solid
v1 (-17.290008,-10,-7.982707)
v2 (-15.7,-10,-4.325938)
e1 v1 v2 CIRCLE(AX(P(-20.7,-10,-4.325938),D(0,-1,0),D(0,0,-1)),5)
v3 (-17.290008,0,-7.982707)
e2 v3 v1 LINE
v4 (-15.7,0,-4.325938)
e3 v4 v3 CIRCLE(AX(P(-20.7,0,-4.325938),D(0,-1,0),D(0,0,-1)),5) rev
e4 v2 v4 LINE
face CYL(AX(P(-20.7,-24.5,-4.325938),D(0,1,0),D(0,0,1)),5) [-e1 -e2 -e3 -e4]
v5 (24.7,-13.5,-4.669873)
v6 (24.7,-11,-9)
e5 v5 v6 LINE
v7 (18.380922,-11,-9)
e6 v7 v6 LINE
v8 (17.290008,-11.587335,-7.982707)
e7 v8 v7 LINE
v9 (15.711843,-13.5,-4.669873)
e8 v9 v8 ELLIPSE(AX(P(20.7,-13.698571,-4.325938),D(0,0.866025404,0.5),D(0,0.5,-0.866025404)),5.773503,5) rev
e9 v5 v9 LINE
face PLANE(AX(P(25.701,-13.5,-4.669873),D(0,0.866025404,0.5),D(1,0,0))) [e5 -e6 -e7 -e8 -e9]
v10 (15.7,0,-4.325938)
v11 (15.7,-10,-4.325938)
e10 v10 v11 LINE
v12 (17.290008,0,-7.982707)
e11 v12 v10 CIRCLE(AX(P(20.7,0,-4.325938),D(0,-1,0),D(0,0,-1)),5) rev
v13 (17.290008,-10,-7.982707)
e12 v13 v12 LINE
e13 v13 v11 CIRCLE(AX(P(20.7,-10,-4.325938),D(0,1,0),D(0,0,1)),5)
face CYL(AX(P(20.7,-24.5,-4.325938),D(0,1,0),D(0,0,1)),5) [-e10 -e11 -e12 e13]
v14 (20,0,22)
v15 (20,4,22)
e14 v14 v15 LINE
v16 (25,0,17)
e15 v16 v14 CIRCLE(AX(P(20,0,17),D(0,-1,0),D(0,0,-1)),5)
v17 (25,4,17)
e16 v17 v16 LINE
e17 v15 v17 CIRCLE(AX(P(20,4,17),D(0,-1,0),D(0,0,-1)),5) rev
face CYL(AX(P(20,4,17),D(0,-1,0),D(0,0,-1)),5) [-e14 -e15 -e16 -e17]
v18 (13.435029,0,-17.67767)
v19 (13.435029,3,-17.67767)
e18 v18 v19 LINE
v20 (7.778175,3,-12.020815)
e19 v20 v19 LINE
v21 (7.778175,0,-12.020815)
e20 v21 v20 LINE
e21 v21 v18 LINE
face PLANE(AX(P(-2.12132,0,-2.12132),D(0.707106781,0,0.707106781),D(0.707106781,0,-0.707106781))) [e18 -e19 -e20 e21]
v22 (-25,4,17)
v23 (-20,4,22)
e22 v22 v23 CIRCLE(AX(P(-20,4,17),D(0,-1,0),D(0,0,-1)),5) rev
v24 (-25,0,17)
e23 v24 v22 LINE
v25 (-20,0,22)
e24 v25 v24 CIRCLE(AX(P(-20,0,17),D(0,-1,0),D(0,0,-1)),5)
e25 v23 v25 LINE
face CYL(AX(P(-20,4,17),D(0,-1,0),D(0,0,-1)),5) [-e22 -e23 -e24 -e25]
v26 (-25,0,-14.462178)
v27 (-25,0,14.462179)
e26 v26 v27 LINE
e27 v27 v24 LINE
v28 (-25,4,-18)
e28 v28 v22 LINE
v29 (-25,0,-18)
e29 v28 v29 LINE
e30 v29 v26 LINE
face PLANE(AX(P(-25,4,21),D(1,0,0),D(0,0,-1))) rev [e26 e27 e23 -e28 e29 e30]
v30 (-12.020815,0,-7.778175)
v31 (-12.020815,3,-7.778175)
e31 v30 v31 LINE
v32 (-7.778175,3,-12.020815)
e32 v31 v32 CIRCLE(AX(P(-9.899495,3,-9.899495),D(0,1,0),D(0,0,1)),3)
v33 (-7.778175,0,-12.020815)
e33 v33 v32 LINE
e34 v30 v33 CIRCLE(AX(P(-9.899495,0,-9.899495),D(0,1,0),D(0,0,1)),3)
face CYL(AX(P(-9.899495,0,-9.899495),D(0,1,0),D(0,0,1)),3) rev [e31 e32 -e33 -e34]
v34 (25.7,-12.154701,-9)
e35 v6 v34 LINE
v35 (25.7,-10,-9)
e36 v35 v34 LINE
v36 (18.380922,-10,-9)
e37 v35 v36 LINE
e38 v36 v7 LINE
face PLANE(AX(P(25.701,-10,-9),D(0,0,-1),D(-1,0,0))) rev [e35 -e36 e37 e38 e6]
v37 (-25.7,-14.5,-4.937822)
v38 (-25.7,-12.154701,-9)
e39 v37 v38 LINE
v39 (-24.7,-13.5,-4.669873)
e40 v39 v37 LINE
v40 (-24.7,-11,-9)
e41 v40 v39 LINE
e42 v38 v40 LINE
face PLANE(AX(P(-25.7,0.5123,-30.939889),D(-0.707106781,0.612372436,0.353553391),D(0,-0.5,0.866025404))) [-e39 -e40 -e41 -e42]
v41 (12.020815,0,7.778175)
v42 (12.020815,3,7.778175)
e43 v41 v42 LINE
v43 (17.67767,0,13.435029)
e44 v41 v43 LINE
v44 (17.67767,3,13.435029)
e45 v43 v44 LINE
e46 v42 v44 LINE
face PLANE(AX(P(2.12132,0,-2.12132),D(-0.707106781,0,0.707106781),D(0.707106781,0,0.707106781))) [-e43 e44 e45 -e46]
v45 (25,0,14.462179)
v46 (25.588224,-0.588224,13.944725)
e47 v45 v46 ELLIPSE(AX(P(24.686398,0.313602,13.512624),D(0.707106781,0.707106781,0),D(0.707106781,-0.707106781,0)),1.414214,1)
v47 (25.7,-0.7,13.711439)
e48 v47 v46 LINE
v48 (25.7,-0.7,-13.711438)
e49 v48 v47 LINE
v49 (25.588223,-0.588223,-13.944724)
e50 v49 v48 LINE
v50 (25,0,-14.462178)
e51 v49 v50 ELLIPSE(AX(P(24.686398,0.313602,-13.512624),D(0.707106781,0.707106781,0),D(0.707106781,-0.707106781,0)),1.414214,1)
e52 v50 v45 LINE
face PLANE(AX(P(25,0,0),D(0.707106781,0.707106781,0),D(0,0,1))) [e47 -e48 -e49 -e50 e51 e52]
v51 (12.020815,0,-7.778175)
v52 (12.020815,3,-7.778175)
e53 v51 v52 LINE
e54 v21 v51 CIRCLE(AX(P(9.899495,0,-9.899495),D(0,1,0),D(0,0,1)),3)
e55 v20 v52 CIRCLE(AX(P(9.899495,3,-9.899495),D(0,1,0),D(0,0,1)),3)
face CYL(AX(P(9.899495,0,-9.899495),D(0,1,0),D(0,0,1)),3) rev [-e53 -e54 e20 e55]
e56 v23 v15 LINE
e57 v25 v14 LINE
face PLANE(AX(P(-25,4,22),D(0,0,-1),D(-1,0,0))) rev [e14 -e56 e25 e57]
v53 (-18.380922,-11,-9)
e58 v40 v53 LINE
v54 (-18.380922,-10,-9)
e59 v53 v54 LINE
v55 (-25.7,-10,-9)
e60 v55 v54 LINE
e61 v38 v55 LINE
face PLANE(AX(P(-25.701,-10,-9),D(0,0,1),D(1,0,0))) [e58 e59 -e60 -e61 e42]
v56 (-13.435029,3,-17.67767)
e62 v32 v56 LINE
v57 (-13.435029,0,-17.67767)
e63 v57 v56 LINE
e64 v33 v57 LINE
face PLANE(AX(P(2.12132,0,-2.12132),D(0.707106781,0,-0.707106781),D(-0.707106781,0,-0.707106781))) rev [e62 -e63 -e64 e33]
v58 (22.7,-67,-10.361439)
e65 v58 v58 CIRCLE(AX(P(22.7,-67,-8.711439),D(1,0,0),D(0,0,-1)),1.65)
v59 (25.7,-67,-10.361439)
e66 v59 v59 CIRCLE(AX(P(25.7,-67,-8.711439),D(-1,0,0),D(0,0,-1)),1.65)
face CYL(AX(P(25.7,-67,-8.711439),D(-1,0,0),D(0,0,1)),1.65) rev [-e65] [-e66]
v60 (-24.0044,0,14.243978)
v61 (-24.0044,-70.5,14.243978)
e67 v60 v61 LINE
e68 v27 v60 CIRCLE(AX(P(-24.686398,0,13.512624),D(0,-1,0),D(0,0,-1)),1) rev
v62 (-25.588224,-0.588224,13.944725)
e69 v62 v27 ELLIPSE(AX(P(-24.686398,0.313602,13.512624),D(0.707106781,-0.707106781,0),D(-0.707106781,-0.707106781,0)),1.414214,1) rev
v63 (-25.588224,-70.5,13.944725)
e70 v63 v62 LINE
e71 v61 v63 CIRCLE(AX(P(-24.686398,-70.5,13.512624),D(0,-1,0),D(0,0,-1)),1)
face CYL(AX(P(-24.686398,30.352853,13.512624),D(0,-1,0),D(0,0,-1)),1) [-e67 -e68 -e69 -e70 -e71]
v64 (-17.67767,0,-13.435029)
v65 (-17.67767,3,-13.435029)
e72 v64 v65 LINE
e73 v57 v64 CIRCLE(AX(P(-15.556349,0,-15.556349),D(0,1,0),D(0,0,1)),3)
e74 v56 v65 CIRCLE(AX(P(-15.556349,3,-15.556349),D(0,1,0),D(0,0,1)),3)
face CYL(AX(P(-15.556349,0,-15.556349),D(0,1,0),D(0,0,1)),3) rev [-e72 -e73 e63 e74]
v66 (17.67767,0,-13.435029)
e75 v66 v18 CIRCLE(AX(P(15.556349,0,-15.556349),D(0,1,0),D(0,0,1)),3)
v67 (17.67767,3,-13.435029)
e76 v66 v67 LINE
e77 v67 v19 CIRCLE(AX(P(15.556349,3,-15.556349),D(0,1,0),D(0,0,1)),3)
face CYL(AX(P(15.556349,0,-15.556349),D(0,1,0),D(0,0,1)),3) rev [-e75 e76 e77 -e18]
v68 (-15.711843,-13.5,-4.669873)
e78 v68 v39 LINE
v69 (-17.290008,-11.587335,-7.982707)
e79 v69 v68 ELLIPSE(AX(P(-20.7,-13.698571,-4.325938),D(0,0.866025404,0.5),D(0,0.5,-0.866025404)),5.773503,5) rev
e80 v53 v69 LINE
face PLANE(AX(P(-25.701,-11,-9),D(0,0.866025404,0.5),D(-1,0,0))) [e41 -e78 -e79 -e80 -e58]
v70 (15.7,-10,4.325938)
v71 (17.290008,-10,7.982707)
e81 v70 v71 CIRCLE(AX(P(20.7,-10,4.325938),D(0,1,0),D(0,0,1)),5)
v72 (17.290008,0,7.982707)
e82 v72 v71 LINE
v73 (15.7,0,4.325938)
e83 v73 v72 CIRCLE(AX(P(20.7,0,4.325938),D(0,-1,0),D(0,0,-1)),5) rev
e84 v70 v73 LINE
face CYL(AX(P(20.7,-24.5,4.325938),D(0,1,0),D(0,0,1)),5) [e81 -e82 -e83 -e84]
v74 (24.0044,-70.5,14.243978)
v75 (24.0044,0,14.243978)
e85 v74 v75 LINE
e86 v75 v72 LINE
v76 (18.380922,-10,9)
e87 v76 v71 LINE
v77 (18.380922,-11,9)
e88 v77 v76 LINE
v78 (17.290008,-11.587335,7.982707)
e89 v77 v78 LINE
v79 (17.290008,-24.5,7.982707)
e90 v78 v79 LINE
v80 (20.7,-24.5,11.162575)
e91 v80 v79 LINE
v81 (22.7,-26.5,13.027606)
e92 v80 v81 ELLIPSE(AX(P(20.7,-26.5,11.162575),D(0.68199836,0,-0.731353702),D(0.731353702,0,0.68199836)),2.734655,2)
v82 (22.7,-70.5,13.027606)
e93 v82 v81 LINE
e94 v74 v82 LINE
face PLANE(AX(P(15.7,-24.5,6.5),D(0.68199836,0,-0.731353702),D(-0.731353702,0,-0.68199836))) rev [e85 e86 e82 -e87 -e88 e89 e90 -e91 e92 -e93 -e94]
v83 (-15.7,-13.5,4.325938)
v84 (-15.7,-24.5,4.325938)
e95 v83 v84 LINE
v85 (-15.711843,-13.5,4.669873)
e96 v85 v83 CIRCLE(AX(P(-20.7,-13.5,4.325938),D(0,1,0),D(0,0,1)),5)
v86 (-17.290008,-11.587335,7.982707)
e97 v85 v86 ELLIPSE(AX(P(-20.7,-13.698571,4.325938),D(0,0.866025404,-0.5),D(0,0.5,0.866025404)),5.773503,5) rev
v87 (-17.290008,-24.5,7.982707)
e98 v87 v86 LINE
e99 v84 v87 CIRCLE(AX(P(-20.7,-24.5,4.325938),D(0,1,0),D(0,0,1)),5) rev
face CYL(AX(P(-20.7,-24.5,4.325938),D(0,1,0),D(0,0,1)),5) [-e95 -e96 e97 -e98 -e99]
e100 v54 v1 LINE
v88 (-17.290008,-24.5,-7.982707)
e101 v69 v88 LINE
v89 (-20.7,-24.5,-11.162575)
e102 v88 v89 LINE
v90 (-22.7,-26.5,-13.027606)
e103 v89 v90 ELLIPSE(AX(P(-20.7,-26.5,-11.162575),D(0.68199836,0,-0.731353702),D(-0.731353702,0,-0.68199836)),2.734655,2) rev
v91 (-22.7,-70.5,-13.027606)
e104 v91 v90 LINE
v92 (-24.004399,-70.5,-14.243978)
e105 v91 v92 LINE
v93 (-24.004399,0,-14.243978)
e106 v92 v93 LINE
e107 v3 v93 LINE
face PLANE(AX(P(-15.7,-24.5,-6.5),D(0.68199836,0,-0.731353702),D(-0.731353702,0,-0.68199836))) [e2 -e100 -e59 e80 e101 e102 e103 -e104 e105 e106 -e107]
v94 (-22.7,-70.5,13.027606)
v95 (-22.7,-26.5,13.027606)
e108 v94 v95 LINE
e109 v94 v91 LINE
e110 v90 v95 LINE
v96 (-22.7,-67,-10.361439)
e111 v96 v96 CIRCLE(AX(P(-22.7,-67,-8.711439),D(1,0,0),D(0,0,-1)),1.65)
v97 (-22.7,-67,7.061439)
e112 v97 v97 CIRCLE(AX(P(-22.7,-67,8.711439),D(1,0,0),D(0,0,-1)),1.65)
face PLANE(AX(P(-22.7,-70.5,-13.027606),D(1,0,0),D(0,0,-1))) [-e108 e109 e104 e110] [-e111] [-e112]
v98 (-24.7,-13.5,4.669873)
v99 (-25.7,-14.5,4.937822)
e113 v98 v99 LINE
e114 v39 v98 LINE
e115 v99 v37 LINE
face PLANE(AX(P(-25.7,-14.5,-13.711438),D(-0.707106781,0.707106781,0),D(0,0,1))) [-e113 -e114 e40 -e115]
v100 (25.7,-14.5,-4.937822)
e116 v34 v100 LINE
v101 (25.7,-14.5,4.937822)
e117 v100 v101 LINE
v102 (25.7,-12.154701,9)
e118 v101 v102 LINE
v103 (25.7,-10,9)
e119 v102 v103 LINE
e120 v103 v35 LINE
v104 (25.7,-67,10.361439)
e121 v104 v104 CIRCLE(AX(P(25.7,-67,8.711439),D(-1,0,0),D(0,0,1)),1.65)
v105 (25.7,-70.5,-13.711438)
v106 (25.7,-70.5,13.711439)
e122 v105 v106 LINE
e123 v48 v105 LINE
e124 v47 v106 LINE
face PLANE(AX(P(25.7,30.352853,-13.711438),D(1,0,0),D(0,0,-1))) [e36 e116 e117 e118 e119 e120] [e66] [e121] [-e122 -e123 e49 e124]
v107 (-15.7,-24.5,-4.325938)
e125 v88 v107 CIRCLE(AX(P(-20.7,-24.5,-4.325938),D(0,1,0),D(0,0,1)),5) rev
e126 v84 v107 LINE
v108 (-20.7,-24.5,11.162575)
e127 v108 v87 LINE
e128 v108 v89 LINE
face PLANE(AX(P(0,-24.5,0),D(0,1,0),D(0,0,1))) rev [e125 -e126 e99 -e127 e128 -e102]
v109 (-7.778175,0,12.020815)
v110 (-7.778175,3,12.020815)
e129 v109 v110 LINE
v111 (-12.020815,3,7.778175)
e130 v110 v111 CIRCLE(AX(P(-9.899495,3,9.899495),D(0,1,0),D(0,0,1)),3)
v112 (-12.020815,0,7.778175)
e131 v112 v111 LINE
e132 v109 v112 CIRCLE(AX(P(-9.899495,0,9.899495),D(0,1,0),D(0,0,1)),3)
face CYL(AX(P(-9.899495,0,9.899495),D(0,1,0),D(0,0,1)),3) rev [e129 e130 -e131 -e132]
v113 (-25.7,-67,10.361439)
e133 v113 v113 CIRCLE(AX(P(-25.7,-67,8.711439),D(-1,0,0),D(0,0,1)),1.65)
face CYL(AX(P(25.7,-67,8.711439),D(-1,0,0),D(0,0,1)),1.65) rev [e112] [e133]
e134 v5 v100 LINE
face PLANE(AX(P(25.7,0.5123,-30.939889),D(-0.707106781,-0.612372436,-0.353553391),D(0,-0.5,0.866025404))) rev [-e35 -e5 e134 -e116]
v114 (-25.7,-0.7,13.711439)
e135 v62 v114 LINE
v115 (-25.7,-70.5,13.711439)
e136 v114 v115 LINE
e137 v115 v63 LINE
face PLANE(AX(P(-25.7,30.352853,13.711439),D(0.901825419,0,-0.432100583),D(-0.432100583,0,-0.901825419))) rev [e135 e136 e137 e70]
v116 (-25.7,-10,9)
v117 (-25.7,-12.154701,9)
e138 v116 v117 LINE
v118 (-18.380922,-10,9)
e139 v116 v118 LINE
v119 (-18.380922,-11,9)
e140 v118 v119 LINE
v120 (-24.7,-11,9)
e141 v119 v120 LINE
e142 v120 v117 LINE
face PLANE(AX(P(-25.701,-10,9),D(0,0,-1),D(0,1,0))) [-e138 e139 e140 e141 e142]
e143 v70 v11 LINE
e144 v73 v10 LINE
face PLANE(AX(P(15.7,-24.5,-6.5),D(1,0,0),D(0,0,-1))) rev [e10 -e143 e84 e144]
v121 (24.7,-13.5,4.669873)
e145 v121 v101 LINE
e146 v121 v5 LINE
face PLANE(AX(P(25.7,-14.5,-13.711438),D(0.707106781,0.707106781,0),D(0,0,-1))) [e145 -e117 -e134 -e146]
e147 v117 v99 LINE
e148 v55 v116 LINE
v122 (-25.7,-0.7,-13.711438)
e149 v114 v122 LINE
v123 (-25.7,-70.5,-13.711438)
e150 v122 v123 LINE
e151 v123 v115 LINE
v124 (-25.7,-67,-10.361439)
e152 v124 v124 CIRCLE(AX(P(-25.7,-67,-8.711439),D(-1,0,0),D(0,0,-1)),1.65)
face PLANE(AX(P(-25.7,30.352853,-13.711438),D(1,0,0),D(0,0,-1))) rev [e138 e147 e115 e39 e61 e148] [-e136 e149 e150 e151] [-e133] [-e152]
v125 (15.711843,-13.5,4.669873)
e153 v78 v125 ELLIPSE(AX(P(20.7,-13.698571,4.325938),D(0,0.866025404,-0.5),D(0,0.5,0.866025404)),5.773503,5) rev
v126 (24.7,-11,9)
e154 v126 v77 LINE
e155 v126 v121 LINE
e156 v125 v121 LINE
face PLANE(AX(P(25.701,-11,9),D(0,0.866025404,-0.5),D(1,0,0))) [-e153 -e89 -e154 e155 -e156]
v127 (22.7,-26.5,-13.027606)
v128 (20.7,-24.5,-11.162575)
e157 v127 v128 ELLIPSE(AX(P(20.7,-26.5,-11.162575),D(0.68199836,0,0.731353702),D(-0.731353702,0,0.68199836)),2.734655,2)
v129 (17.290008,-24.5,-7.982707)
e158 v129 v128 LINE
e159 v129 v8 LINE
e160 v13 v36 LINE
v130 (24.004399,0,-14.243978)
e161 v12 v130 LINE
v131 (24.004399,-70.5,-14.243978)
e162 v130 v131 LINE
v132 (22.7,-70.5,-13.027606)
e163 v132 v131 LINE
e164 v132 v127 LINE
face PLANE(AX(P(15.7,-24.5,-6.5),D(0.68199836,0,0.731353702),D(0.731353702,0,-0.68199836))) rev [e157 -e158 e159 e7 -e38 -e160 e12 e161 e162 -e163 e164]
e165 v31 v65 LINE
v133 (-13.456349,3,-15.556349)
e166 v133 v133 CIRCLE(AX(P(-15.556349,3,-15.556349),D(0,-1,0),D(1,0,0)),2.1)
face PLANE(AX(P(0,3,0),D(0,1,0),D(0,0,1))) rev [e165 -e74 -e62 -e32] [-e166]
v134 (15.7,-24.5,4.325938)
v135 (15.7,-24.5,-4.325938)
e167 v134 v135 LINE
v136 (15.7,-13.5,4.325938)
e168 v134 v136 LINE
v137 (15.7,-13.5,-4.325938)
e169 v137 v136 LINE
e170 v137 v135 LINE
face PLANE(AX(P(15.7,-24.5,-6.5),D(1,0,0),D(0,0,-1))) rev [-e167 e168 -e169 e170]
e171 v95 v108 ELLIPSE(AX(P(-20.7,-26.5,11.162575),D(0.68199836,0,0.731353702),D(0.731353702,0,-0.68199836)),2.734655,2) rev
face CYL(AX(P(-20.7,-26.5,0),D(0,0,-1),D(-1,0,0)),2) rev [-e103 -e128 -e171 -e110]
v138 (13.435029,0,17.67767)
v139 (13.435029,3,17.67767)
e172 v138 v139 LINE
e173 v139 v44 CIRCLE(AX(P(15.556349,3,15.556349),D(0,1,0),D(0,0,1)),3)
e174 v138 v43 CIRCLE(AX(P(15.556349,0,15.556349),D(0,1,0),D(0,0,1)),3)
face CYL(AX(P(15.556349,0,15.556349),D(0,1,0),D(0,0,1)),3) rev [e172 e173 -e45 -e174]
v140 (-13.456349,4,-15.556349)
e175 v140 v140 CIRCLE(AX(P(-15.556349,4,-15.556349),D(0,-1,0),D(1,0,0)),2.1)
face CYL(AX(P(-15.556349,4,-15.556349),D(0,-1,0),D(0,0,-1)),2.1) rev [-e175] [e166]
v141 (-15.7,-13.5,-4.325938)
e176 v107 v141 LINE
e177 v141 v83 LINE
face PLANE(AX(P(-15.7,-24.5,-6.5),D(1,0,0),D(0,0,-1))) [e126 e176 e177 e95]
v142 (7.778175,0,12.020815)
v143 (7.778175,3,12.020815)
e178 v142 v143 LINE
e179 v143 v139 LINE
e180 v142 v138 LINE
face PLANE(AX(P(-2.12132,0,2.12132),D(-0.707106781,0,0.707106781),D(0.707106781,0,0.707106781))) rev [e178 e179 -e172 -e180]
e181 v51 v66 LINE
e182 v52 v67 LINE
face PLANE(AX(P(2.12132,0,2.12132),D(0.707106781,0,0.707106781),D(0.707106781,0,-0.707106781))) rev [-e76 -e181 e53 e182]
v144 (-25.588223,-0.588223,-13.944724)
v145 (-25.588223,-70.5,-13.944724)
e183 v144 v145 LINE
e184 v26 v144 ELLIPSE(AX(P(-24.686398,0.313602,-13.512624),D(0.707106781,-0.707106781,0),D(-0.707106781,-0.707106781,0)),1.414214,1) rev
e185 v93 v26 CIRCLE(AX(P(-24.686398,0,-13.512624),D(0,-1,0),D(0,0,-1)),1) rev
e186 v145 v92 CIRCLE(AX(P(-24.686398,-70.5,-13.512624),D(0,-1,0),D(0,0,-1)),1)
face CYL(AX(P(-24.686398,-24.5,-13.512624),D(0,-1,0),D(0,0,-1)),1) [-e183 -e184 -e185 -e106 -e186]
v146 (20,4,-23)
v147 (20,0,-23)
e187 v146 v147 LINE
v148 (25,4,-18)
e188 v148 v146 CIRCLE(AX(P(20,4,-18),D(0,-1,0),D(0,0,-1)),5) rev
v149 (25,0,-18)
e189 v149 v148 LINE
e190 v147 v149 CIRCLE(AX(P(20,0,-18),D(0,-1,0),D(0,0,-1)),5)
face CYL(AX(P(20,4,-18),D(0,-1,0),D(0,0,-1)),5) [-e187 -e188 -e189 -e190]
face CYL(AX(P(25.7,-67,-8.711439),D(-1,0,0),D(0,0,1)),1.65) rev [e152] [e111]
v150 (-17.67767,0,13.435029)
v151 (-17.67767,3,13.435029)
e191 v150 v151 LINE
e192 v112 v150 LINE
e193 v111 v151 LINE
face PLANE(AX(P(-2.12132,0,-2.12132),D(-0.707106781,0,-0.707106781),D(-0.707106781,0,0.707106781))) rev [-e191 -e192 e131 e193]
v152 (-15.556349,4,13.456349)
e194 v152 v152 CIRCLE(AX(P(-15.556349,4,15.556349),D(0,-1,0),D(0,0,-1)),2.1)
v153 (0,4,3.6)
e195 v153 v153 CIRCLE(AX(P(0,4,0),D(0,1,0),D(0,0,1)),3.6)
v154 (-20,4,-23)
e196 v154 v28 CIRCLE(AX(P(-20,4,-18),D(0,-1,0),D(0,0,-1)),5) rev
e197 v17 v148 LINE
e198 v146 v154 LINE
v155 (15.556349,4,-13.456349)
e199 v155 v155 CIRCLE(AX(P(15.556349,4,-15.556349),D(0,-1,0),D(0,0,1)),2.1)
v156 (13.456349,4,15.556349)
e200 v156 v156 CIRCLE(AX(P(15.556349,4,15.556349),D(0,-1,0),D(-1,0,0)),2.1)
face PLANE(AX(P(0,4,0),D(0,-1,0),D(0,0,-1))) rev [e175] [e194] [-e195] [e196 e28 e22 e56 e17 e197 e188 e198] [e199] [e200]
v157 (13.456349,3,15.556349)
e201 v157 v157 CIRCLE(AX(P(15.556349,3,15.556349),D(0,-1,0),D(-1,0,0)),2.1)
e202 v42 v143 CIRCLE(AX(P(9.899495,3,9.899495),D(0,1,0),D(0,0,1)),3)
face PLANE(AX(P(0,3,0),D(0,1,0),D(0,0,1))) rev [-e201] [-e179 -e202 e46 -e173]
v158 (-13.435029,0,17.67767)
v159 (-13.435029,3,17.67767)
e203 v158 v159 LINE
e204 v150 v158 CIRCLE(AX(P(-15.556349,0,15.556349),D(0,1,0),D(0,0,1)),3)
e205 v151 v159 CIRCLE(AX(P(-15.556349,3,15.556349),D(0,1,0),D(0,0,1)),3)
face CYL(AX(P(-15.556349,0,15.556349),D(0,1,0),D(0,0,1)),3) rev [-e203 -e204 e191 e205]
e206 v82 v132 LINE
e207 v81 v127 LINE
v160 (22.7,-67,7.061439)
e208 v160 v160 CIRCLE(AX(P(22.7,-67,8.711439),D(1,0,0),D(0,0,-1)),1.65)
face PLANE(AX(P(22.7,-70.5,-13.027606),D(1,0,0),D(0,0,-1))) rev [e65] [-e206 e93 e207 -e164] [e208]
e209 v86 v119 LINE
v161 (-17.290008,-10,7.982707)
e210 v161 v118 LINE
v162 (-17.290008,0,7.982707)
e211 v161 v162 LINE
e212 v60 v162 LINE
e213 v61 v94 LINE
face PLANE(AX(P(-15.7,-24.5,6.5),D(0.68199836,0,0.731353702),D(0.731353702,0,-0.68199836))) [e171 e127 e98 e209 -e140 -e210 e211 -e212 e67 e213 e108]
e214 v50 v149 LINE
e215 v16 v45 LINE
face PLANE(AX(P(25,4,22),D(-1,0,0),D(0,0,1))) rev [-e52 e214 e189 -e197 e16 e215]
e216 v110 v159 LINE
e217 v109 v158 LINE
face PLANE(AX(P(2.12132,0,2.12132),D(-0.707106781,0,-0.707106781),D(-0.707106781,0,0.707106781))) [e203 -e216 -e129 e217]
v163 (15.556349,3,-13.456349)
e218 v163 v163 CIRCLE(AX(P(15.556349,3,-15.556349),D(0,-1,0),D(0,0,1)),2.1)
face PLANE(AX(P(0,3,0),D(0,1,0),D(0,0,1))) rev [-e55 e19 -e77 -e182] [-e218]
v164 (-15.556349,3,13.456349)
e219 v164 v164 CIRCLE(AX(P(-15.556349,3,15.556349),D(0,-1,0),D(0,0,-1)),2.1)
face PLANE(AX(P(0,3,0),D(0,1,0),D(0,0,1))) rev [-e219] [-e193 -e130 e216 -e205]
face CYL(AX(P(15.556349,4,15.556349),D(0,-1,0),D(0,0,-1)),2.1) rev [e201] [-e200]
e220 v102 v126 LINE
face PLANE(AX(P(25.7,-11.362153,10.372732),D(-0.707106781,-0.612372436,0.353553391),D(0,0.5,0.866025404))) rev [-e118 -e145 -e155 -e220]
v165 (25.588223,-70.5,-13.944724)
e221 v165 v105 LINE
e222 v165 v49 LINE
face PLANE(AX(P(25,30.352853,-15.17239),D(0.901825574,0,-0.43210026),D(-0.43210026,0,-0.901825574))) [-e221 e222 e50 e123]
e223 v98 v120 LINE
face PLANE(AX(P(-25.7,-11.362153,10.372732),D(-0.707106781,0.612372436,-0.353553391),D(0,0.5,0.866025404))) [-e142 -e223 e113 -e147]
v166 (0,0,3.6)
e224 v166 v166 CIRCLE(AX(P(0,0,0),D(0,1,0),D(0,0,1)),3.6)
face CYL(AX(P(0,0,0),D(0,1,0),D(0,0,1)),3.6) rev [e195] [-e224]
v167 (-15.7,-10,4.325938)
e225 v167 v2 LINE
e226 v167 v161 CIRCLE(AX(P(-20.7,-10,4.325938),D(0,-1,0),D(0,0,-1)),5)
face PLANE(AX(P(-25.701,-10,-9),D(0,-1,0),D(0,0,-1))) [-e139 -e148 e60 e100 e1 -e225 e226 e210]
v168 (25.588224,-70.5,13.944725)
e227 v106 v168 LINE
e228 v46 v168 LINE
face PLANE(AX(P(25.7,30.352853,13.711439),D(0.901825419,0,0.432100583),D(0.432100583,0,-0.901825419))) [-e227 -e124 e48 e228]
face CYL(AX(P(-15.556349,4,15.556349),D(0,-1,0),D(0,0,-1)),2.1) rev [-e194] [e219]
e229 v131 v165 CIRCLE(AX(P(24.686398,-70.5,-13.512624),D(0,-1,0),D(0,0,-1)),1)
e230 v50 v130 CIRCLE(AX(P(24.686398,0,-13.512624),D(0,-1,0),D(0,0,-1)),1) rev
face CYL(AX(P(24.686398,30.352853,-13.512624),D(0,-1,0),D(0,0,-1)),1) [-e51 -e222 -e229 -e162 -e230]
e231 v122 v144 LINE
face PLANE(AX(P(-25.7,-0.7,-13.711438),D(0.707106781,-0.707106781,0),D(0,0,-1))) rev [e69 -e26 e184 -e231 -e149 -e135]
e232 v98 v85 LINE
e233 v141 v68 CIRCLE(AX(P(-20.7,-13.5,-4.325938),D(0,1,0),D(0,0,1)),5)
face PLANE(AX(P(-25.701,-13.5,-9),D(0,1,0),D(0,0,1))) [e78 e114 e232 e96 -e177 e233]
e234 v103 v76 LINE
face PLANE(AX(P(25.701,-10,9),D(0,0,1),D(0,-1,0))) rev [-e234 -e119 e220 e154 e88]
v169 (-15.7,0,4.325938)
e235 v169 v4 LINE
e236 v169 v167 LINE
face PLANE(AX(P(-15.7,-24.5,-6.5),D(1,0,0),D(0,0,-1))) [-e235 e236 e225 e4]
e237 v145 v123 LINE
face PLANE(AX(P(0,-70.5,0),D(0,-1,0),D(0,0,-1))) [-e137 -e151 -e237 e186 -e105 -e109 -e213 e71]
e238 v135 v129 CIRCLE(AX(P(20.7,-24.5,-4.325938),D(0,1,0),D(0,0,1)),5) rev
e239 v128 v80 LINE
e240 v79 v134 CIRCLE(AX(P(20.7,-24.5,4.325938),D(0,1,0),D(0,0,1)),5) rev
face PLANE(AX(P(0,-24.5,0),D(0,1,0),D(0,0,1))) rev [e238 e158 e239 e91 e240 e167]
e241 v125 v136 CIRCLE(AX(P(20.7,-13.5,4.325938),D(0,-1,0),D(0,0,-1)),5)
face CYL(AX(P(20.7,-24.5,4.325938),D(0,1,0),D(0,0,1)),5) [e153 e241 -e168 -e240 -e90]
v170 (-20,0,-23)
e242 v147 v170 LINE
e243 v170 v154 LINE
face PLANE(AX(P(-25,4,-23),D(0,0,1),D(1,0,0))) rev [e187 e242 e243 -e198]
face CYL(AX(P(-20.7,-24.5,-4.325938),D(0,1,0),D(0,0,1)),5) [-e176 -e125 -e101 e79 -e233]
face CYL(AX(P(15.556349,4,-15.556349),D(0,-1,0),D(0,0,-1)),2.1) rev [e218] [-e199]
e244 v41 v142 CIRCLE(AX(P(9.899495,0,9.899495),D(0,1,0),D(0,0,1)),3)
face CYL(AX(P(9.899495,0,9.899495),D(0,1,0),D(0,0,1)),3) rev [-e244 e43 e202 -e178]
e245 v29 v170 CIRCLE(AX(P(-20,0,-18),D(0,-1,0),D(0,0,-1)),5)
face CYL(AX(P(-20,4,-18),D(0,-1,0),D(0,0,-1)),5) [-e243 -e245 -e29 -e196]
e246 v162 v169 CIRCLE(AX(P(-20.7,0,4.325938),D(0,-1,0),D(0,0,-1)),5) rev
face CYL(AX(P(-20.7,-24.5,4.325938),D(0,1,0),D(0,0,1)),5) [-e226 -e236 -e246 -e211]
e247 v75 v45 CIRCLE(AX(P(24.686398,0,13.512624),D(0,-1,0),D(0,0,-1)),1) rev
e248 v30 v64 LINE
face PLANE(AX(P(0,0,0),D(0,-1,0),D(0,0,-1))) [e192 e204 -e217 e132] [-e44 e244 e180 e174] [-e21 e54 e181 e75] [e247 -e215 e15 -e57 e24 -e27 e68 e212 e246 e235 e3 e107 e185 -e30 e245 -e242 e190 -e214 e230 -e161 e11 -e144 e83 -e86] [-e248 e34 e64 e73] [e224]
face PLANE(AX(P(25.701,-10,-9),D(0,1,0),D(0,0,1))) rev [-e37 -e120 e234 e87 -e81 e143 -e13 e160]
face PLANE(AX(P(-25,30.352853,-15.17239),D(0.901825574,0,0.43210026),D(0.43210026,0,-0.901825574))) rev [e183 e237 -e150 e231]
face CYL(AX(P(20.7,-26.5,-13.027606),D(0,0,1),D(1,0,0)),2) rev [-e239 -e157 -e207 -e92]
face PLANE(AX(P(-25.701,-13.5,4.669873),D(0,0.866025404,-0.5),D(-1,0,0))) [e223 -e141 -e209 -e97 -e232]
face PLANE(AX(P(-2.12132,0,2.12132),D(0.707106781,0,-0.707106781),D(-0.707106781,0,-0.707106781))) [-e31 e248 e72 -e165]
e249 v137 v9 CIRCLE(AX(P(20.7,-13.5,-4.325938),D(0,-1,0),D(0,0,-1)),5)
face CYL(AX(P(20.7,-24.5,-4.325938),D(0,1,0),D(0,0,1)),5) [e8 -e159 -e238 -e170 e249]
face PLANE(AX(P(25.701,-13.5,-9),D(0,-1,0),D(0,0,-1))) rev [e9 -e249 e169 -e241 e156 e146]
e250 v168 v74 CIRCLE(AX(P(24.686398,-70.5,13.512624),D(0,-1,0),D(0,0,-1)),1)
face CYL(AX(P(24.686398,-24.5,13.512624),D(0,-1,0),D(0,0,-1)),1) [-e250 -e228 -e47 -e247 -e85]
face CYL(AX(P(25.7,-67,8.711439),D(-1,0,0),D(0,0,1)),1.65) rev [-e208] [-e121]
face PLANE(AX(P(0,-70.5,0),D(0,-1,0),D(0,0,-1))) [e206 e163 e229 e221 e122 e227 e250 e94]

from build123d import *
from OCP.BRepFilletAPI import BRepFilletAPI_MakeChamfer

# Parameters (mm, degrees)
DODANIE_WYCI_GNI_CIE2_DEPTH = 4
WYTNIJ_WYCI_GNI_CIE3_START  = -1
WYTNIJ_WYCI_GNI_CIE3_DEPTH  = 34.205262753
SZKIC6_3_R                  = 3.6
WYTNIJ_WYCI_GNI_CIE4_DEPTH  = 35.205262753
DODANIE_WYCI_GNI_CIE3_DEPTH = 24.5
DODANIE_WYCI_GNI_CIE4_DEPTH = 46
DODANIE_WYCI_GNI_CIE5_DEPTH = 70.5
SFAZOWANIE3_SIZE            = 0.7
ZAOKR_GLENIE1_R             = 1
ZAOKR_GLENIE2_R             = 5
WYTNIJ_WYCI_GNI_CIE1_REACH  = 86.592
SZKIC3_W                    = 18
SZKIC3_H                    = 3.5
SFAZOWANIE1_SIZE            = 2.5
SFAZOWANIE1_SIZE2           = 4.330127019
ZAOKR_GLENIE4_R             = 2
SFAZOWANIE2_SIZE            = 1
ZAOKR_GLENIE3_R             = 5
SZKIC10_R                   = 2.1
WYTNIJ_WYCI_GNI_CIE5_DEPTH  = 82.189531345
SZYK_KO_OWY1_COUNT          = 4
SZKIC12_R                   = 1.65
WYTNIJ_WYCI_GNI_CIE6_DEPTH  = 91.228653985


# Read off the part's stored shape, not the designer's step: Lustro1
# Some blends are built 0.0001 mm under size
with BuildPart() as part:
    # Szkic1 → Dodanie-wyciągnięcie2 (new body)
    with BuildSketch(Plane(origin=(0, 0, 0), x_dir=(1, 0, 0), z_dir=(0, 1, 0))):
        Polygon((-25, -21), (-25, -22), (25, -22), (25, -21), (25, 23), (-25, 23), align=None)
    extrude(amount=DODANIE_WYCI_GNI_CIE2_DEPTH)

    # Szkic6 → Wytnij-wyciągnięcie3 (cut, through all)
    with BuildSketch(Plane(origin=(0, 4, 0), x_dir=(1, 0, 0), z_dir=(0, 1, 0)).offset(WYTNIJ_WYCI_GNI_CIE3_START)):
        with BuildLine():
            Line((-12.02081528, -7.778174593), (-17.67766953, -13.435028843))
            ThreePointArc((-17.67766953, -13.435028843), (-17.67766953, -17.67766953), (-13.435028843, -17.67766953))
            Line((-13.435028843, -17.67766953), (-7.778174593, -12.02081528))
            ThreePointArc((-7.778174593, -12.02081528), (-7.778174593, -7.778174593), (-12.02081528, -7.778174593))
        make_face()
        with BuildLine():
            Line((-7.778174593, 12.02081528), (-13.435028843, 17.67766953))
            ThreePointArc((-13.435028843, 17.67766953), (-17.67766953, 17.67766953), (-17.67766953, 13.435028843))
            Line((-17.67766953, 13.435028843), (-12.02081528, 7.778174593))
            ThreePointArc((-12.02081528, 7.778174593), (-7.778174593, 7.778174593), (-7.778174593, 12.02081528))
        make_face()
        with BuildLine():
            Line((12.02081528, 7.778174593), (17.67766953, 13.435028843))
            ThreePointArc((17.67766953, 13.435028843), (17.67766953, 17.67766953), (13.435028843, 17.67766953))
            Line((13.435028843, 17.67766953), (7.778174593, 12.02081528))
            ThreePointArc((7.778174593, 12.02081528), (7.778174593, 7.778174593), (12.02081528, 7.778174593))
        make_face()
        with BuildLine():
            Line((7.778174593, -12.02081528), (13.435028843, -17.67766953))
            ThreePointArc((13.435028843, -17.67766953), (17.67766953, -17.67766953), (17.67766953, -13.435028843))
            Line((17.67766953, -13.435028843), (12.02081528, -7.778174593))
            ThreePointArc((12.02081528, -7.778174593), (7.778174593, -7.778174593), (7.778174593, -12.02081528))
        make_face()
    extrude(amount=-WYTNIJ_WYCI_GNI_CIE3_DEPTH, mode=Mode.SUBTRACT)

    # Szkic6<3> → Wytnij-wyciągnięcie4 (cut, through all)
    with BuildSketch(Plane(origin=(0, 4, 0), x_dir=(1, 0, 0), z_dir=(0, 1, 0))):
        with Locations(Location((0, 0, 0), (0, 0, 270))):
            Circle(SZKIC6_3_R)
    extrude(amount=-WYTNIJ_WYCI_GNI_CIE4_DEPTH, mode=Mode.SUBTRACT)

    # Szkic2 → Dodanie-wyciągnięcie3 (add)
    with BuildSketch(Plane.XZ):
        Polygon((15.7, -6.5), (15.7, 6.5), (25, 15.172390301), (25, -15.172390301), align=None)
    extrude(amount=DODANIE_WYCI_GNI_CIE3_DEPTH)

    # Szkic8 → Dodanie-wyciągnięcie4 (add)
    with BuildSketch(Plane.XZ.offset(24.5)):
        Polygon((25, 15.172390301), (25, -15.172390301), (22.7, -13.027605603), (22.7, 13.027605603), align=None)
    extrude(amount=DODANIE_WYCI_GNI_CIE4_DEPTH)

    # Szkic11 → Dodanie-wyciągnięcie5 (add)
    with BuildSketch(Plane.XZ.offset(70.5)):
        Polygon((25, 15.172390301), (25, -15.172390301), (25.7, -13.711437924), (25.7, 13.711439266), align=None)
    extrude(amount=-DODANIE_WYCI_GNI_CIE5_DEPTH)

    # Sfazowanie3
    sfazowanie3_edges = [part.edges().sort_by_distance(p)[0] for p in [
        (25.7, 0, 6.71e-07),
    ]]
    chamfer(sfazowanie3_edges, length=SFAZOWANIE3_SIZE - 0.0001)  # a hair under: the kernel refuses the full size

    # Zaokrąglenie1
    # the kernel refuses this fillet: 1 mm, written as the material it takes off along each edge
    with BuildSketch(Plane(origin=(25, 0, 15.172390301), x_dir=(0.4321005826211705, 0, -0.9018254190797934), z_dir=(0, -1, 0))) as zaokr_glenie1_piece_1:
        with BuildLine():
            CenterArc((ZAOKR_GLENIE1_R * 1.36131157072, -ZAOKR_GLENIE1_R), ZAOKR_GLENIE1_R, 90, 107.399057565)
            Line((ZAOKR_GLENIE1_R * 0.407066323534, -ZAOKR_GLENIE1_R * 1.2990250963), (0, 0))
            Line((0, 0), (ZAOKR_GLENIE1_R * 1.36131157072, 0))
        make_face()
    extrude(amount=73.903278927, mode=Mode.SUBTRACT)
    with BuildSketch(Plane(origin=(25, -73.903280204, -15.172390301), x_dir=(0.43210025968346966, 0, 0.901825573812075), z_dir=(0, 1, 0))) as zaokr_glenie1_piece_2:
        with BuildLine():
            CenterArc((ZAOKR_GLENIE1_R * 1.36131208157, -ZAOKR_GLENIE1_R), ZAOKR_GLENIE1_R, 90, 107.399078082)
            Line((ZAOKR_GLENIE1_R * 0.407066941463, -ZAOKR_GLENIE1_R * 1.29902543801), (0, 0))
            Line((0, 0), (ZAOKR_GLENIE1_R * 1.36131208157, 0))
        make_face()
    extrude(amount=73.903280204, mode=Mode.SUBTRACT)

    # Zaokrąglenie2
    zaokr_glenie2_edges = [part.edges().sort_by_distance(p)[0] for p in [
        (15.7, -12.25, 6.5),
        (15.7, -12.25, -6.5),
    ]]
    fillet(zaokr_glenie2_edges, radius=ZAOKR_GLENIE2_R)

    # Szkic3 → Wytnij-wyciągnięcie1 (cut, up to next)
    with BuildSketch(Plane.ZY.offset(-15.7), mode=Mode.PRIVATE) as wytnij_wyci_gni_cie1_sk1:
        with Locations((0, -11.75)):
            Rectangle(SZKIC3_W, SZKIC3_H)
    wytnij_wyci_gni_cie1_tool1 = extrude(wytnij_wyci_gni_cie1_sk1.sketch, amount=-WYTNIJ_WYCI_GNI_CIE1_REACH, mode=Mode.PRIVATE) & part.part
    add(wytnij_wyci_gni_cie1_tool1.solids().sort_by_distance((15.7, -11.75, 0))[0], mode=Mode.SUBTRACT)

    # Sfazowanie1: one chamfer whose edges measure the first distance from different faces: ONE call of the kernel's chamfer builder (chamfer() names one face for all edges)
    sfazowanie1_edges_1 = [part.edges().sort_by_distance(p)[0] for p in [
        (22.040460888, -13.5, -9),
    ]]
    sfazowanie1_side_1 = [part.faces().sort_by_distance(p)[0] for p in [
        (22.040460888, -11.75, -9),
    ]]
    sfazowanie1_edges_2 = [part.edges().sort_by_distance(p)[0] for p in [
        (22.040460888, -13.5, 9),
    ]]
    sfazowanie1_side_2 = [part.faces().sort_by_distance(p)[0] for p in [
        (22.040460888, -11.75, 9),
    ]]
    sfazowanie1 = BRepFilletAPI_MakeChamfer(part.part.solid().wrapped)
    for e in sfazowanie1_edges_1:
        sfazowanie1.Add(SFAZOWANIE1_SIZE, SFAZOWANIE1_SIZE2, e.wrapped, sfazowanie1_side_1[0].wrapped)  # the first distance lies on this face
    for e in sfazowanie1_edges_2:
        sfazowanie1.Add(SFAZOWANIE1_SIZE, SFAZOWANIE1_SIZE2, e.wrapped, sfazowanie1_side_2[0].wrapped)  # the first distance lies on this face
    add(Compound.cast(sfazowanie1.Shape()), mode=Mode.REPLACE)

    # Zaokrąglenie4
    zaokr_glenie4_edges = [part.edges().sort_by_distance(p)[0] for p in [
        (22.7, -24.5, 0),
    ]]
    fillet(zaokr_glenie4_edges, radius=ZAOKR_GLENIE4_R)

    # Lustro1: part across plane


with BuildPart() as part_1:
    add(part.part)
    add(part.part.mirror(Plane(origin=(0, 0, 0), x_dir=(0, 0, 1), z_dir=(1, 0, 0))))

    # Sfazowanie2
    sfazowanie2_edges = [part_1.edges().sort_by_distance(p)[0] for p in [
        (25.7, -13.5, 0),
        (25.7, -12.25, -6.834936491),
        (25.7, -12.25, 6.834936491),
        (-25.7, -13.5, 0),
        (-25.7, -12.25, -6.834936491),
        (-25.7, -12.25, 6.834936491),
    ]]
    chamfer(sfazowanie2_edges, length=SFAZOWANIE2_SIZE)

    # Zaokrąglenie3
    zaokr_glenie3_edges = [part_1.edges().sort_by_distance(p)[0] for p in [
        (25, 2, 22),
        (-25, 2, 22),
        (-25, 2, -23),
        (25, 2, -23),
    ]]
    fillet(zaokr_glenie3_edges, radius=ZAOKR_GLENIE3_R)

    # Szkic10 → Wytnij-wyciągnięcie5 (cut, through all)
    with BuildSketch(Plane.XZ.offset(-3)):
        with Locations(Location((-15.556349186, 15.556349186, 0), (0, 0, 270))):
            Circle(SZKIC10_R)
    wytnij_wyci_gni_cie5 = extrude(amount=-WYTNIJ_WYCI_GNI_CIE5_DEPTH, mode=Mode.SUBTRACT)

    # Szyk kołowy1: Wytnij-wyciągnięcie5 ×4 about axis
    szyk_ko_owy1_axis = Axis((0, 0, 0), (0, 1, 0))
    for i in range(1, SZYK_KO_OWY1_COUNT):
        add(wytnij_wyci_gni_cie5.rotate(szyk_ko_owy1_axis, i * 360 / SZYK_KO_OWY1_COUNT), mode=Mode.SUBTRACT)

    # Szkic12 → Wytnij-wyciągnięcie6 (cut, through all)
    with BuildSketch(Plane.ZY.offset(25.7)):
        with Locations((8.711439266, -67)):
            Circle(SZKIC12_R)
        with Locations(Location((-8.711439266, -67, 0), (0, 0, 180))):
            Circle(SZKIC12_R)
    extrude(amount=-WYTNIJ_WYCI_GNI_CIE6_DEPTH, mode=Mode.SUBTRACT)


solid = part_1.part
